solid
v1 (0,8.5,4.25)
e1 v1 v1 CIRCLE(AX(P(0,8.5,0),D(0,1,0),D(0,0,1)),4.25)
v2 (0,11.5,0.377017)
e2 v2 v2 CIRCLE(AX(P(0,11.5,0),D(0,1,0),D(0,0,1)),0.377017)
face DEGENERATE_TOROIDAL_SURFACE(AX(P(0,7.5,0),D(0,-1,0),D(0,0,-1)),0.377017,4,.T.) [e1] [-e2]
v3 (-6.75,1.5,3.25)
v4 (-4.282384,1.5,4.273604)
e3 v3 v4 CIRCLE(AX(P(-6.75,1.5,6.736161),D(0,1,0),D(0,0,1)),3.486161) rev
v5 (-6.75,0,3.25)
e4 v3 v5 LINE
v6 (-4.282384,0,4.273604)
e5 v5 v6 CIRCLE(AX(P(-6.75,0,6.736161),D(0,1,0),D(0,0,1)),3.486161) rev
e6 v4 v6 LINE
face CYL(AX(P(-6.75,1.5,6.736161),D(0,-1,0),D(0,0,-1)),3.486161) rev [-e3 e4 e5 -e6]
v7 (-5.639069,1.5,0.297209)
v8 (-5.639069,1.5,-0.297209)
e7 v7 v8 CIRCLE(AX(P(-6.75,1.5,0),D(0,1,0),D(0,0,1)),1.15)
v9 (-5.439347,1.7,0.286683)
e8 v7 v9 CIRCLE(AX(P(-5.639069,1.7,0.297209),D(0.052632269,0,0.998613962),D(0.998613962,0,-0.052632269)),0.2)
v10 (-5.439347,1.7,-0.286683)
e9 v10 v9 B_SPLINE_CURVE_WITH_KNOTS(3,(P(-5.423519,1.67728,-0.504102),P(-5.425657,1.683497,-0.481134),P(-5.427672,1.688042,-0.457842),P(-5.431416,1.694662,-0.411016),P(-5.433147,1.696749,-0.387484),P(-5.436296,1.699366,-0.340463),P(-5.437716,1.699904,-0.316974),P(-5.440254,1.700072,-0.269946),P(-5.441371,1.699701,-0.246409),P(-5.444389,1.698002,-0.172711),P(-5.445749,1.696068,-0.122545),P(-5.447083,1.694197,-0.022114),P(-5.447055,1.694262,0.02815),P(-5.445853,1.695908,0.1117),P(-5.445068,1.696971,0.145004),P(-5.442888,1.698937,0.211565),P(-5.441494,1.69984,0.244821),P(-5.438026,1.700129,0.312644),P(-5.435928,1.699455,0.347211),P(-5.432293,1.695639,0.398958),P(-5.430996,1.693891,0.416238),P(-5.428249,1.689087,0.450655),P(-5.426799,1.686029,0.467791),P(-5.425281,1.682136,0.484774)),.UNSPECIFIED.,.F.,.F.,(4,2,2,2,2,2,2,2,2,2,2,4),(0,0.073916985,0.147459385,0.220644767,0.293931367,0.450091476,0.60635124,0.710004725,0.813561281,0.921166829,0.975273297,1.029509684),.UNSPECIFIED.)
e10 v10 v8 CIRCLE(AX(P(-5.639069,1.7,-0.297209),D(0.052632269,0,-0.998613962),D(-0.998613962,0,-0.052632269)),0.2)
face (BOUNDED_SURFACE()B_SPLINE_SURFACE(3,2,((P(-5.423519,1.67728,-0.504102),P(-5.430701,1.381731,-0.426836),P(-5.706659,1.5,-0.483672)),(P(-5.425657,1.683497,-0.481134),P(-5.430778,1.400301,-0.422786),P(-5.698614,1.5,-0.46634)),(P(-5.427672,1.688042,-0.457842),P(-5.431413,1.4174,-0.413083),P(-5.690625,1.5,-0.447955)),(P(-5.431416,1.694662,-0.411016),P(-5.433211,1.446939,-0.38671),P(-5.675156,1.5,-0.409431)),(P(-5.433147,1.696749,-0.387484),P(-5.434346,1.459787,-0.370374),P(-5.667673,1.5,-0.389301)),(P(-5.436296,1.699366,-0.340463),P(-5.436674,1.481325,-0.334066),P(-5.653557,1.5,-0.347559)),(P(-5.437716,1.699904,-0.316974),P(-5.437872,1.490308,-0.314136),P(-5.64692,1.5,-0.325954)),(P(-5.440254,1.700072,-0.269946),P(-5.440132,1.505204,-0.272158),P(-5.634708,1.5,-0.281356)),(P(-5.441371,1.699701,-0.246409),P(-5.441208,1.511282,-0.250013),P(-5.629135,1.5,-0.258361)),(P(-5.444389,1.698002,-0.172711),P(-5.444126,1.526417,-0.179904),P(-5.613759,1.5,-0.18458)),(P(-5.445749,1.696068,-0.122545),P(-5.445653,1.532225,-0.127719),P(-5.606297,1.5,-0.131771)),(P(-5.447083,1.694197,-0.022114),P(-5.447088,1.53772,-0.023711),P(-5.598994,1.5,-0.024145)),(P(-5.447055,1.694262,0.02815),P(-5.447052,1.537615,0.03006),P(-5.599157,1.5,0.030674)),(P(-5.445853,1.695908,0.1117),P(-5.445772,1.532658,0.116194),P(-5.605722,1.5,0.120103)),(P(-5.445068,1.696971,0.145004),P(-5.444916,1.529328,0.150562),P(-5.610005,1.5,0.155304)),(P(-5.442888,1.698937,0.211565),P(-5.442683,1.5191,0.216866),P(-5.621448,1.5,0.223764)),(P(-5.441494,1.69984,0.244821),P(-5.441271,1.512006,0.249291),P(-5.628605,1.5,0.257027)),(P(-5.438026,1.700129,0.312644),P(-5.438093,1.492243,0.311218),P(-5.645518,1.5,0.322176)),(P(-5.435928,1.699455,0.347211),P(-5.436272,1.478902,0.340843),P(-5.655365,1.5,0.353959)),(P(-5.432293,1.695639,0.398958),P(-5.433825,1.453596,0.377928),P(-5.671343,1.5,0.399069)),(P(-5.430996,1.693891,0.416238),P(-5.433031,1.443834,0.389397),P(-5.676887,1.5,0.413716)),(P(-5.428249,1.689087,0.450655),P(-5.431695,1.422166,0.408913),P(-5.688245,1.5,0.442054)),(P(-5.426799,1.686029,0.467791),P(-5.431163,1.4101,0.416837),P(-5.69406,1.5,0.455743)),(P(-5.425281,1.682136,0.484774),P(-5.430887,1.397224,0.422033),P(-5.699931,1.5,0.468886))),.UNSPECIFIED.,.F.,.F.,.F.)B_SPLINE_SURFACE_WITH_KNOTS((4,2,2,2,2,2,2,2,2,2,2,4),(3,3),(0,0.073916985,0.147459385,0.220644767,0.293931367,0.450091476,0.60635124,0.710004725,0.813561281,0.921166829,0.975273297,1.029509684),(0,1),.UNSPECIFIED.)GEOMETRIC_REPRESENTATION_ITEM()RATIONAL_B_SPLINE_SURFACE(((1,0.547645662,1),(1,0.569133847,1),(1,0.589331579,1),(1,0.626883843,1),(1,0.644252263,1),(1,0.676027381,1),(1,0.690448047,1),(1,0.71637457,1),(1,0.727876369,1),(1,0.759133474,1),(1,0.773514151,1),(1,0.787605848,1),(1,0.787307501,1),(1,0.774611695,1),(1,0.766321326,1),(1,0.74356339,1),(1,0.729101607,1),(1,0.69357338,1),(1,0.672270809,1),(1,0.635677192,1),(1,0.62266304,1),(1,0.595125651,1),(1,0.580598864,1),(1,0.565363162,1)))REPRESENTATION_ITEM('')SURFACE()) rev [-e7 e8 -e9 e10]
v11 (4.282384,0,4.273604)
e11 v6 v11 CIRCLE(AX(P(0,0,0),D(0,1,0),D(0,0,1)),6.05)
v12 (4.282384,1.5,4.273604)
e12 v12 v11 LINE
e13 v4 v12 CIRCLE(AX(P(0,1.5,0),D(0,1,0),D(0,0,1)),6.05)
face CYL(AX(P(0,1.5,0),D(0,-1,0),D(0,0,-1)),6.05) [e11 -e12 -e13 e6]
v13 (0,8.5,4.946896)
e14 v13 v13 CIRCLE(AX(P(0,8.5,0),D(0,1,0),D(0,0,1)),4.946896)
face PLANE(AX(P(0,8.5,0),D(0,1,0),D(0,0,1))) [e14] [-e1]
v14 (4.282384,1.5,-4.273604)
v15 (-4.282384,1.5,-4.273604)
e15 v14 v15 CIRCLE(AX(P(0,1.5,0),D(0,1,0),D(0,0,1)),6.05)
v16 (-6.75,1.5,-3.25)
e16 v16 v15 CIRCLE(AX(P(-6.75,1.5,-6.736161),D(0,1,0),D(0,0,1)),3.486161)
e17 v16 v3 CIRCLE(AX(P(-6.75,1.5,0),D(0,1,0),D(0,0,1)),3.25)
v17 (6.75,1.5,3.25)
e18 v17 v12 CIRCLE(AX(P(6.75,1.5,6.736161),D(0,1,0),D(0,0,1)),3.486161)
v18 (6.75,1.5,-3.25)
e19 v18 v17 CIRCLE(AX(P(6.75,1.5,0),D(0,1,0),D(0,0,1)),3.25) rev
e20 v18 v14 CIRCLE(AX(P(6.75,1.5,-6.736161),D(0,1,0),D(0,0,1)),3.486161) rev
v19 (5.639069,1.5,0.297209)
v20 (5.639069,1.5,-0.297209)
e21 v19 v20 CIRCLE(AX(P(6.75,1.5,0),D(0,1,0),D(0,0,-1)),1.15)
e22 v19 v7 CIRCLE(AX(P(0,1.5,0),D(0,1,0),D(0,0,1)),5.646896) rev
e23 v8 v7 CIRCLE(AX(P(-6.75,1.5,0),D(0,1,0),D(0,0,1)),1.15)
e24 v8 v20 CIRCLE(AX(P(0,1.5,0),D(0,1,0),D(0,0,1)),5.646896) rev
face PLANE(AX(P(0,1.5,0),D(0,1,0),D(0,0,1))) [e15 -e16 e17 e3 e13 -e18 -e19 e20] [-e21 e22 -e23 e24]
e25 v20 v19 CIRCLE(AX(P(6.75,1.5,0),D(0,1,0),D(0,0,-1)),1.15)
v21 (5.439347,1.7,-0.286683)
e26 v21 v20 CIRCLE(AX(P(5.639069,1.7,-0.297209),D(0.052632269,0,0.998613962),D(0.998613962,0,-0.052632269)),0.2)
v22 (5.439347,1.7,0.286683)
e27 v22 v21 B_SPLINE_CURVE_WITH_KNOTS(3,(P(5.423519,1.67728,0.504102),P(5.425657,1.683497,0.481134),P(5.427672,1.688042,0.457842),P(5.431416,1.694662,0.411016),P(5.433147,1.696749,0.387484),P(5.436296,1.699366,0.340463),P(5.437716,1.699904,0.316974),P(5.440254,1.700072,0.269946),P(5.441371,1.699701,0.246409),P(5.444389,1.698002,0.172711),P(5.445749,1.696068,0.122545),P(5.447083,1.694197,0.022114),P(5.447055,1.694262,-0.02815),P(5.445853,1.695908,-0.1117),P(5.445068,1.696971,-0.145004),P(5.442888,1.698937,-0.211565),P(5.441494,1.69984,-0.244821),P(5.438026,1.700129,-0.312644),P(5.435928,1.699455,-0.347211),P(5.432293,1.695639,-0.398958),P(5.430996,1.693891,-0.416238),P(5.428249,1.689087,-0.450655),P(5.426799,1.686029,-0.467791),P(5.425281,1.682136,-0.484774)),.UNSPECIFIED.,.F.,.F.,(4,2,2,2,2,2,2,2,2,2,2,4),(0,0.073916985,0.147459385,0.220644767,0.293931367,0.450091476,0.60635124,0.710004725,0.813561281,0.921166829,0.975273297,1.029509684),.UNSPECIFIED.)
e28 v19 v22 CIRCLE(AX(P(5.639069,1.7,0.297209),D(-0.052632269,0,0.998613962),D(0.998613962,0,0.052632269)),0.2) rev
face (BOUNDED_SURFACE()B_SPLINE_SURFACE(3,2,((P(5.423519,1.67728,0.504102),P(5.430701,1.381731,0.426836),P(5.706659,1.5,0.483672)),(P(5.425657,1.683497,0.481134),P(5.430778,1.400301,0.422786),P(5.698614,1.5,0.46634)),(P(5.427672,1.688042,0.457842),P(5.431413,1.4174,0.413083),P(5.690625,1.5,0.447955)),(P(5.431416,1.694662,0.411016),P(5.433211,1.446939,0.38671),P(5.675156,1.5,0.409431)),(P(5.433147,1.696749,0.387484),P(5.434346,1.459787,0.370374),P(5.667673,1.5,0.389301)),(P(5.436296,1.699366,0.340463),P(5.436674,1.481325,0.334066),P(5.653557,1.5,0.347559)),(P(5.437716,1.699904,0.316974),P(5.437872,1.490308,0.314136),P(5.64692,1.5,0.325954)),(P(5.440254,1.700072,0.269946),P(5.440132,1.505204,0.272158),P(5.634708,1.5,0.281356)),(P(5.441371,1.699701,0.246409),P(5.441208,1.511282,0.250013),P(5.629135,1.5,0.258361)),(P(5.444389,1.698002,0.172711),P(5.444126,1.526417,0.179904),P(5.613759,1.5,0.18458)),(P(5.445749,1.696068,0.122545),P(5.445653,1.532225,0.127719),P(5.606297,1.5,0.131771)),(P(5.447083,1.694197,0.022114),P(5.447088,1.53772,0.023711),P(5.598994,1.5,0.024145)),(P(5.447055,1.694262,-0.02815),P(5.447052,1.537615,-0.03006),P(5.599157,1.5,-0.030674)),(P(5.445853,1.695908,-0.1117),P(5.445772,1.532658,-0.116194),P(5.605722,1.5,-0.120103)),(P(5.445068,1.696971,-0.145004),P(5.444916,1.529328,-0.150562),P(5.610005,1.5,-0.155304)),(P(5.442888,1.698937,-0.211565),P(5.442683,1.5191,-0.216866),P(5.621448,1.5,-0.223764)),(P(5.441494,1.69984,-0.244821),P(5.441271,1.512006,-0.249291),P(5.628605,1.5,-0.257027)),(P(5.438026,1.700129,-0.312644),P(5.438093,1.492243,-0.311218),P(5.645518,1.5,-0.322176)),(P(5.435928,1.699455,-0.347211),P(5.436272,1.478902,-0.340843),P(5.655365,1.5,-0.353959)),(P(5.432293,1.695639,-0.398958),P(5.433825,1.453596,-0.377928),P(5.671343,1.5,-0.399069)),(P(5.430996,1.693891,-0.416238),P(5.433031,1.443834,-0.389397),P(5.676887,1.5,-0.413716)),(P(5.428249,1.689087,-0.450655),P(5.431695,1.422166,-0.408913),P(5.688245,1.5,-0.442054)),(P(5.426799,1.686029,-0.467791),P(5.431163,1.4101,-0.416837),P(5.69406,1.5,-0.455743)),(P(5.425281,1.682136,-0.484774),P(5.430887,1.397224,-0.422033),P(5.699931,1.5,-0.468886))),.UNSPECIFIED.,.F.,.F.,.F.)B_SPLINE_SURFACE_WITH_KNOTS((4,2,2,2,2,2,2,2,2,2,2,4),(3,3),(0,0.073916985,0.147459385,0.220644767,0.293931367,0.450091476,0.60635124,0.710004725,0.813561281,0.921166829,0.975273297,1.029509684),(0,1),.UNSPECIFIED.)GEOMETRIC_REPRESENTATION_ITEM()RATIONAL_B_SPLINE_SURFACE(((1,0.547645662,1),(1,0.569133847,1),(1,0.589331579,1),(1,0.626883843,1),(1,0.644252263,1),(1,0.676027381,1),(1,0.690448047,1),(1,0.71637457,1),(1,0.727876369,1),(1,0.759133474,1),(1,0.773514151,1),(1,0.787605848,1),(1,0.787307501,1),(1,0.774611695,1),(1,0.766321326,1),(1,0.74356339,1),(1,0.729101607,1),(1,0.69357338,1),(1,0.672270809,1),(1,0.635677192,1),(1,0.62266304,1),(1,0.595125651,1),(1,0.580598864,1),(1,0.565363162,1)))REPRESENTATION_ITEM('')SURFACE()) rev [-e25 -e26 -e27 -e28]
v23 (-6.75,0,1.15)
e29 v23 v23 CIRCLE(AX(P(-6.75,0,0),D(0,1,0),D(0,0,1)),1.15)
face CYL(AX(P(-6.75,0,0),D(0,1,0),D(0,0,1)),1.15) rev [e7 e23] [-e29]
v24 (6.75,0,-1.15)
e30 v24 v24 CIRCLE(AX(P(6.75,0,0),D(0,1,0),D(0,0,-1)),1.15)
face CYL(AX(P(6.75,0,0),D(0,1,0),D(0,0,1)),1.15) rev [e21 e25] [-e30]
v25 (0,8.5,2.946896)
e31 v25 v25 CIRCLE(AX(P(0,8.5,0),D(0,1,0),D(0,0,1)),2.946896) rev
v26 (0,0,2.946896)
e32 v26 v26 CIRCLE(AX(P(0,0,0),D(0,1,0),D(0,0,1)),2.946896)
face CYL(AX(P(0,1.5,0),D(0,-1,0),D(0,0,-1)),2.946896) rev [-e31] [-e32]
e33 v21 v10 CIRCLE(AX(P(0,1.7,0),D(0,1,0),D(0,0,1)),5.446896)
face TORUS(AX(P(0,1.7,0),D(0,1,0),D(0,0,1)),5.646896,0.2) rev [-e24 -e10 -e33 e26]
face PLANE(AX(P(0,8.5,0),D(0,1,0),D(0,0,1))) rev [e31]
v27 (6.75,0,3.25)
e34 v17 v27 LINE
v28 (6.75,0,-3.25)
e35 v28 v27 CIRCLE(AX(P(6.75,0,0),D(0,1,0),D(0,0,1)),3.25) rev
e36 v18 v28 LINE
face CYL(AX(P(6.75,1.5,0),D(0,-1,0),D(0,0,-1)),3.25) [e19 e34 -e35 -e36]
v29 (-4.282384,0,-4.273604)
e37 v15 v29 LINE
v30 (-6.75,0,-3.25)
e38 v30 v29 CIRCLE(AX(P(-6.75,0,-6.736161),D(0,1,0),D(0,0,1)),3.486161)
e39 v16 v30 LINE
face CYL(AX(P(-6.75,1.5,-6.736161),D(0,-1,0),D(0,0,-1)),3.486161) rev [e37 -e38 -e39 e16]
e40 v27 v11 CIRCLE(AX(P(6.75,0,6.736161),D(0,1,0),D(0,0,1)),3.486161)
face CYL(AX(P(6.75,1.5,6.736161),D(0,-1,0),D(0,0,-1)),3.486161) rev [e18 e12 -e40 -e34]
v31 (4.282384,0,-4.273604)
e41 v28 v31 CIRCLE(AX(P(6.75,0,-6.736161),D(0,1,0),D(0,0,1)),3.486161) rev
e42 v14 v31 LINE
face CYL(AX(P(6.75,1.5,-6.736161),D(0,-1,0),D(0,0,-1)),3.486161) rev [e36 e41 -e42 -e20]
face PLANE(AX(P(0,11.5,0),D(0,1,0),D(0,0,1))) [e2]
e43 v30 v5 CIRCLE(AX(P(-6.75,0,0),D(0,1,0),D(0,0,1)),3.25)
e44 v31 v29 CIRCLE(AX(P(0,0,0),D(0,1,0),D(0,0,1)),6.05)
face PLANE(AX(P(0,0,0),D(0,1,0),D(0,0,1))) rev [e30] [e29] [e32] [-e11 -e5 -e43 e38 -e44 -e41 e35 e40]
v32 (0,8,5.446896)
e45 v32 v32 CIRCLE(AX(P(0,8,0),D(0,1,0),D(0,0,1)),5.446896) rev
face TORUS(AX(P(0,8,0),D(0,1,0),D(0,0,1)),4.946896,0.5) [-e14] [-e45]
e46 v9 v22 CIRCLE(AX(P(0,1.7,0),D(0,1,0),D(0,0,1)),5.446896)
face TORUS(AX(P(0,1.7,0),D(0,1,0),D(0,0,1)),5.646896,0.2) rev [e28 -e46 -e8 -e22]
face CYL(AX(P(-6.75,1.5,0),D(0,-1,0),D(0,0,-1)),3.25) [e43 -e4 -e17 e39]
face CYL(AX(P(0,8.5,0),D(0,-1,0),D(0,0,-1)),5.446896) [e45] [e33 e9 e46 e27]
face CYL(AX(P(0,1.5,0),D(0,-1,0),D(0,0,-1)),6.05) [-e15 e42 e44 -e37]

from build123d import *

# Parameters (mm, degrees)
SKETCH1_R           = 2.946896199
BOSS_EXTRUDE1_DEPTH = 1.5
SKETCH2_R           = 1.15
CUT_EXTRUDE1_DEPTH  = 12.783569069
SKETCH3_R           = 5.446896199
SKETCH3_R_2         = 2.946896199
BOSS_EXTRUDE2_DEPTH = 7
SKETCH4_R           = 4.25
BOSS_EXTRUDE3_DEPTH = 3
FILLET1_R           = 4
FILLET2_R           = 0.5
FILLET3_R           = 0.2


with BuildPart() as part:
    # Sketch1 → Boss-Extrude1 (new body)
    with BuildSketch(Plane(origin=(0, 0, 0), x_dir=(1, 0, 0), z_dir=(0, 1, 0))):
        with BuildLine():
            ThreePointArc((-4.282383784, -4.273603764), (0, -6.05), (4.282383784, -4.273603764))
            ThreePointArc((4.282383784, -4.273603764), (5.414251665, -3.516053121), (6.75, -3.25))
            ThreePointArc((6.75, -3.25), (10, 0), (6.75, 3.25))
            ThreePointArc((6.75, 3.25), (5.414251665, 3.516053121), (4.282383784, 4.273603764))
            ThreePointArc((4.282383784, 4.273603764), (0, 6.05), (-4.282383784, 4.273603764))
            ThreePointArc((-4.282383784, 4.273603764), (-5.414251665, 3.516053121), (-6.75, 3.25))
            ThreePointArc((-6.75, 3.25), (-10, 0), (-6.75, -3.25))
            ThreePointArc((-6.75, -3.25), (-5.414251665, -3.516053121), (-4.282383784, -4.273603764))
        make_face()
        with Locations(Location((0, 0, 0), (0, 0, 270))):
            Circle(SKETCH1_R, mode=Mode.SUBTRACT)
    extrude(amount=BOSS_EXTRUDE1_DEPTH)

    # Sketch2 → Cut-Extrude1 (cut, through all)
    with BuildSketch(Plane(origin=(0, 1.5, 0), x_dir=(1, 0, 0), z_dir=(0, 1, 0))):
        with Locations(Location((-6.75, 0, 0), (0, 0, 270))):
            Circle(SKETCH2_R)
        with Locations(Location((6.75, 0, 0), (0, 0, 90))):
            Circle(SKETCH2_R)
    extrude(amount=-CUT_EXTRUDE1_DEPTH, mode=Mode.SUBTRACT)

    # Sketch3 → Boss-Extrude2 (add)
    with BuildSketch(Plane(origin=(0, 1.5, 0), x_dir=(1, 0, 0), z_dir=(0, 1, 0))):
        with Locations(Location((0, 0, 0), (0, 0, 270))):
            Circle(SKETCH3_R)
        with Locations(Location((0, 0, 0), (0, 0, 270))):
            Circle(SKETCH3_R_2, mode=Mode.SUBTRACT)
    extrude(amount=BOSS_EXTRUDE2_DEPTH)

    # Sketch4 → Boss-Extrude3 (add)
    with BuildSketch(Plane(origin=(0, 8.5, 0), x_dir=(1, 0, 0), z_dir=(0, 1, 0))):
        with Locations(Location((0, 0, 0), (0, 0, 270))):
            Circle(SKETCH4_R)
    extrude(amount=BOSS_EXTRUDE3_DEPTH)

    # Fillet1
    # the kernel refuses this fillet: 4 mm, written as the material it takes off along each edge
    with BuildSketch(Plane(origin=(0, 11.5, 0), x_dir=(0, 0, 1), z_dir=(-1, 0, 0))) as fillet1_piece_1:
        with BuildLine():
            CenterArc((0.377016654, -4), FILLET1_R, 14.477512186, 75.522487814)
            Line((0.377016654, 0), (0.377016654, 0.08))
            Line((0.377016654, 0.08), (4.25, 0.08))
            Line((4.25, 0.08), (4.33, 0))
            ThreePointArc((4.33, 0), (4.33, -1.5), (4.327459667, -2.98))
            Line((4.327459667, -2.98), (4.25, -3))
        make_face()
    revolve(axis=Axis((0, 11.5, 0), (0, 1, 0)), mode=Mode.SUBTRACT)

    # Fillet2
    fillet2_edges = [part.edges().sort_by_distance(p)[0] for p in [
        (0, 8.5, -5.446896199),
    ]]
    fillet(fillet2_edges, radius=FILLET2_R)

    # Fillet3
    fillet3_edges = [part.edges().sort_by_distance(p)[0] for p in [
        (0, 1.5, -5.446896199),
    ]]
    fillet(fillet3_edges, radius=FILLET3_R)


solid = part.part
